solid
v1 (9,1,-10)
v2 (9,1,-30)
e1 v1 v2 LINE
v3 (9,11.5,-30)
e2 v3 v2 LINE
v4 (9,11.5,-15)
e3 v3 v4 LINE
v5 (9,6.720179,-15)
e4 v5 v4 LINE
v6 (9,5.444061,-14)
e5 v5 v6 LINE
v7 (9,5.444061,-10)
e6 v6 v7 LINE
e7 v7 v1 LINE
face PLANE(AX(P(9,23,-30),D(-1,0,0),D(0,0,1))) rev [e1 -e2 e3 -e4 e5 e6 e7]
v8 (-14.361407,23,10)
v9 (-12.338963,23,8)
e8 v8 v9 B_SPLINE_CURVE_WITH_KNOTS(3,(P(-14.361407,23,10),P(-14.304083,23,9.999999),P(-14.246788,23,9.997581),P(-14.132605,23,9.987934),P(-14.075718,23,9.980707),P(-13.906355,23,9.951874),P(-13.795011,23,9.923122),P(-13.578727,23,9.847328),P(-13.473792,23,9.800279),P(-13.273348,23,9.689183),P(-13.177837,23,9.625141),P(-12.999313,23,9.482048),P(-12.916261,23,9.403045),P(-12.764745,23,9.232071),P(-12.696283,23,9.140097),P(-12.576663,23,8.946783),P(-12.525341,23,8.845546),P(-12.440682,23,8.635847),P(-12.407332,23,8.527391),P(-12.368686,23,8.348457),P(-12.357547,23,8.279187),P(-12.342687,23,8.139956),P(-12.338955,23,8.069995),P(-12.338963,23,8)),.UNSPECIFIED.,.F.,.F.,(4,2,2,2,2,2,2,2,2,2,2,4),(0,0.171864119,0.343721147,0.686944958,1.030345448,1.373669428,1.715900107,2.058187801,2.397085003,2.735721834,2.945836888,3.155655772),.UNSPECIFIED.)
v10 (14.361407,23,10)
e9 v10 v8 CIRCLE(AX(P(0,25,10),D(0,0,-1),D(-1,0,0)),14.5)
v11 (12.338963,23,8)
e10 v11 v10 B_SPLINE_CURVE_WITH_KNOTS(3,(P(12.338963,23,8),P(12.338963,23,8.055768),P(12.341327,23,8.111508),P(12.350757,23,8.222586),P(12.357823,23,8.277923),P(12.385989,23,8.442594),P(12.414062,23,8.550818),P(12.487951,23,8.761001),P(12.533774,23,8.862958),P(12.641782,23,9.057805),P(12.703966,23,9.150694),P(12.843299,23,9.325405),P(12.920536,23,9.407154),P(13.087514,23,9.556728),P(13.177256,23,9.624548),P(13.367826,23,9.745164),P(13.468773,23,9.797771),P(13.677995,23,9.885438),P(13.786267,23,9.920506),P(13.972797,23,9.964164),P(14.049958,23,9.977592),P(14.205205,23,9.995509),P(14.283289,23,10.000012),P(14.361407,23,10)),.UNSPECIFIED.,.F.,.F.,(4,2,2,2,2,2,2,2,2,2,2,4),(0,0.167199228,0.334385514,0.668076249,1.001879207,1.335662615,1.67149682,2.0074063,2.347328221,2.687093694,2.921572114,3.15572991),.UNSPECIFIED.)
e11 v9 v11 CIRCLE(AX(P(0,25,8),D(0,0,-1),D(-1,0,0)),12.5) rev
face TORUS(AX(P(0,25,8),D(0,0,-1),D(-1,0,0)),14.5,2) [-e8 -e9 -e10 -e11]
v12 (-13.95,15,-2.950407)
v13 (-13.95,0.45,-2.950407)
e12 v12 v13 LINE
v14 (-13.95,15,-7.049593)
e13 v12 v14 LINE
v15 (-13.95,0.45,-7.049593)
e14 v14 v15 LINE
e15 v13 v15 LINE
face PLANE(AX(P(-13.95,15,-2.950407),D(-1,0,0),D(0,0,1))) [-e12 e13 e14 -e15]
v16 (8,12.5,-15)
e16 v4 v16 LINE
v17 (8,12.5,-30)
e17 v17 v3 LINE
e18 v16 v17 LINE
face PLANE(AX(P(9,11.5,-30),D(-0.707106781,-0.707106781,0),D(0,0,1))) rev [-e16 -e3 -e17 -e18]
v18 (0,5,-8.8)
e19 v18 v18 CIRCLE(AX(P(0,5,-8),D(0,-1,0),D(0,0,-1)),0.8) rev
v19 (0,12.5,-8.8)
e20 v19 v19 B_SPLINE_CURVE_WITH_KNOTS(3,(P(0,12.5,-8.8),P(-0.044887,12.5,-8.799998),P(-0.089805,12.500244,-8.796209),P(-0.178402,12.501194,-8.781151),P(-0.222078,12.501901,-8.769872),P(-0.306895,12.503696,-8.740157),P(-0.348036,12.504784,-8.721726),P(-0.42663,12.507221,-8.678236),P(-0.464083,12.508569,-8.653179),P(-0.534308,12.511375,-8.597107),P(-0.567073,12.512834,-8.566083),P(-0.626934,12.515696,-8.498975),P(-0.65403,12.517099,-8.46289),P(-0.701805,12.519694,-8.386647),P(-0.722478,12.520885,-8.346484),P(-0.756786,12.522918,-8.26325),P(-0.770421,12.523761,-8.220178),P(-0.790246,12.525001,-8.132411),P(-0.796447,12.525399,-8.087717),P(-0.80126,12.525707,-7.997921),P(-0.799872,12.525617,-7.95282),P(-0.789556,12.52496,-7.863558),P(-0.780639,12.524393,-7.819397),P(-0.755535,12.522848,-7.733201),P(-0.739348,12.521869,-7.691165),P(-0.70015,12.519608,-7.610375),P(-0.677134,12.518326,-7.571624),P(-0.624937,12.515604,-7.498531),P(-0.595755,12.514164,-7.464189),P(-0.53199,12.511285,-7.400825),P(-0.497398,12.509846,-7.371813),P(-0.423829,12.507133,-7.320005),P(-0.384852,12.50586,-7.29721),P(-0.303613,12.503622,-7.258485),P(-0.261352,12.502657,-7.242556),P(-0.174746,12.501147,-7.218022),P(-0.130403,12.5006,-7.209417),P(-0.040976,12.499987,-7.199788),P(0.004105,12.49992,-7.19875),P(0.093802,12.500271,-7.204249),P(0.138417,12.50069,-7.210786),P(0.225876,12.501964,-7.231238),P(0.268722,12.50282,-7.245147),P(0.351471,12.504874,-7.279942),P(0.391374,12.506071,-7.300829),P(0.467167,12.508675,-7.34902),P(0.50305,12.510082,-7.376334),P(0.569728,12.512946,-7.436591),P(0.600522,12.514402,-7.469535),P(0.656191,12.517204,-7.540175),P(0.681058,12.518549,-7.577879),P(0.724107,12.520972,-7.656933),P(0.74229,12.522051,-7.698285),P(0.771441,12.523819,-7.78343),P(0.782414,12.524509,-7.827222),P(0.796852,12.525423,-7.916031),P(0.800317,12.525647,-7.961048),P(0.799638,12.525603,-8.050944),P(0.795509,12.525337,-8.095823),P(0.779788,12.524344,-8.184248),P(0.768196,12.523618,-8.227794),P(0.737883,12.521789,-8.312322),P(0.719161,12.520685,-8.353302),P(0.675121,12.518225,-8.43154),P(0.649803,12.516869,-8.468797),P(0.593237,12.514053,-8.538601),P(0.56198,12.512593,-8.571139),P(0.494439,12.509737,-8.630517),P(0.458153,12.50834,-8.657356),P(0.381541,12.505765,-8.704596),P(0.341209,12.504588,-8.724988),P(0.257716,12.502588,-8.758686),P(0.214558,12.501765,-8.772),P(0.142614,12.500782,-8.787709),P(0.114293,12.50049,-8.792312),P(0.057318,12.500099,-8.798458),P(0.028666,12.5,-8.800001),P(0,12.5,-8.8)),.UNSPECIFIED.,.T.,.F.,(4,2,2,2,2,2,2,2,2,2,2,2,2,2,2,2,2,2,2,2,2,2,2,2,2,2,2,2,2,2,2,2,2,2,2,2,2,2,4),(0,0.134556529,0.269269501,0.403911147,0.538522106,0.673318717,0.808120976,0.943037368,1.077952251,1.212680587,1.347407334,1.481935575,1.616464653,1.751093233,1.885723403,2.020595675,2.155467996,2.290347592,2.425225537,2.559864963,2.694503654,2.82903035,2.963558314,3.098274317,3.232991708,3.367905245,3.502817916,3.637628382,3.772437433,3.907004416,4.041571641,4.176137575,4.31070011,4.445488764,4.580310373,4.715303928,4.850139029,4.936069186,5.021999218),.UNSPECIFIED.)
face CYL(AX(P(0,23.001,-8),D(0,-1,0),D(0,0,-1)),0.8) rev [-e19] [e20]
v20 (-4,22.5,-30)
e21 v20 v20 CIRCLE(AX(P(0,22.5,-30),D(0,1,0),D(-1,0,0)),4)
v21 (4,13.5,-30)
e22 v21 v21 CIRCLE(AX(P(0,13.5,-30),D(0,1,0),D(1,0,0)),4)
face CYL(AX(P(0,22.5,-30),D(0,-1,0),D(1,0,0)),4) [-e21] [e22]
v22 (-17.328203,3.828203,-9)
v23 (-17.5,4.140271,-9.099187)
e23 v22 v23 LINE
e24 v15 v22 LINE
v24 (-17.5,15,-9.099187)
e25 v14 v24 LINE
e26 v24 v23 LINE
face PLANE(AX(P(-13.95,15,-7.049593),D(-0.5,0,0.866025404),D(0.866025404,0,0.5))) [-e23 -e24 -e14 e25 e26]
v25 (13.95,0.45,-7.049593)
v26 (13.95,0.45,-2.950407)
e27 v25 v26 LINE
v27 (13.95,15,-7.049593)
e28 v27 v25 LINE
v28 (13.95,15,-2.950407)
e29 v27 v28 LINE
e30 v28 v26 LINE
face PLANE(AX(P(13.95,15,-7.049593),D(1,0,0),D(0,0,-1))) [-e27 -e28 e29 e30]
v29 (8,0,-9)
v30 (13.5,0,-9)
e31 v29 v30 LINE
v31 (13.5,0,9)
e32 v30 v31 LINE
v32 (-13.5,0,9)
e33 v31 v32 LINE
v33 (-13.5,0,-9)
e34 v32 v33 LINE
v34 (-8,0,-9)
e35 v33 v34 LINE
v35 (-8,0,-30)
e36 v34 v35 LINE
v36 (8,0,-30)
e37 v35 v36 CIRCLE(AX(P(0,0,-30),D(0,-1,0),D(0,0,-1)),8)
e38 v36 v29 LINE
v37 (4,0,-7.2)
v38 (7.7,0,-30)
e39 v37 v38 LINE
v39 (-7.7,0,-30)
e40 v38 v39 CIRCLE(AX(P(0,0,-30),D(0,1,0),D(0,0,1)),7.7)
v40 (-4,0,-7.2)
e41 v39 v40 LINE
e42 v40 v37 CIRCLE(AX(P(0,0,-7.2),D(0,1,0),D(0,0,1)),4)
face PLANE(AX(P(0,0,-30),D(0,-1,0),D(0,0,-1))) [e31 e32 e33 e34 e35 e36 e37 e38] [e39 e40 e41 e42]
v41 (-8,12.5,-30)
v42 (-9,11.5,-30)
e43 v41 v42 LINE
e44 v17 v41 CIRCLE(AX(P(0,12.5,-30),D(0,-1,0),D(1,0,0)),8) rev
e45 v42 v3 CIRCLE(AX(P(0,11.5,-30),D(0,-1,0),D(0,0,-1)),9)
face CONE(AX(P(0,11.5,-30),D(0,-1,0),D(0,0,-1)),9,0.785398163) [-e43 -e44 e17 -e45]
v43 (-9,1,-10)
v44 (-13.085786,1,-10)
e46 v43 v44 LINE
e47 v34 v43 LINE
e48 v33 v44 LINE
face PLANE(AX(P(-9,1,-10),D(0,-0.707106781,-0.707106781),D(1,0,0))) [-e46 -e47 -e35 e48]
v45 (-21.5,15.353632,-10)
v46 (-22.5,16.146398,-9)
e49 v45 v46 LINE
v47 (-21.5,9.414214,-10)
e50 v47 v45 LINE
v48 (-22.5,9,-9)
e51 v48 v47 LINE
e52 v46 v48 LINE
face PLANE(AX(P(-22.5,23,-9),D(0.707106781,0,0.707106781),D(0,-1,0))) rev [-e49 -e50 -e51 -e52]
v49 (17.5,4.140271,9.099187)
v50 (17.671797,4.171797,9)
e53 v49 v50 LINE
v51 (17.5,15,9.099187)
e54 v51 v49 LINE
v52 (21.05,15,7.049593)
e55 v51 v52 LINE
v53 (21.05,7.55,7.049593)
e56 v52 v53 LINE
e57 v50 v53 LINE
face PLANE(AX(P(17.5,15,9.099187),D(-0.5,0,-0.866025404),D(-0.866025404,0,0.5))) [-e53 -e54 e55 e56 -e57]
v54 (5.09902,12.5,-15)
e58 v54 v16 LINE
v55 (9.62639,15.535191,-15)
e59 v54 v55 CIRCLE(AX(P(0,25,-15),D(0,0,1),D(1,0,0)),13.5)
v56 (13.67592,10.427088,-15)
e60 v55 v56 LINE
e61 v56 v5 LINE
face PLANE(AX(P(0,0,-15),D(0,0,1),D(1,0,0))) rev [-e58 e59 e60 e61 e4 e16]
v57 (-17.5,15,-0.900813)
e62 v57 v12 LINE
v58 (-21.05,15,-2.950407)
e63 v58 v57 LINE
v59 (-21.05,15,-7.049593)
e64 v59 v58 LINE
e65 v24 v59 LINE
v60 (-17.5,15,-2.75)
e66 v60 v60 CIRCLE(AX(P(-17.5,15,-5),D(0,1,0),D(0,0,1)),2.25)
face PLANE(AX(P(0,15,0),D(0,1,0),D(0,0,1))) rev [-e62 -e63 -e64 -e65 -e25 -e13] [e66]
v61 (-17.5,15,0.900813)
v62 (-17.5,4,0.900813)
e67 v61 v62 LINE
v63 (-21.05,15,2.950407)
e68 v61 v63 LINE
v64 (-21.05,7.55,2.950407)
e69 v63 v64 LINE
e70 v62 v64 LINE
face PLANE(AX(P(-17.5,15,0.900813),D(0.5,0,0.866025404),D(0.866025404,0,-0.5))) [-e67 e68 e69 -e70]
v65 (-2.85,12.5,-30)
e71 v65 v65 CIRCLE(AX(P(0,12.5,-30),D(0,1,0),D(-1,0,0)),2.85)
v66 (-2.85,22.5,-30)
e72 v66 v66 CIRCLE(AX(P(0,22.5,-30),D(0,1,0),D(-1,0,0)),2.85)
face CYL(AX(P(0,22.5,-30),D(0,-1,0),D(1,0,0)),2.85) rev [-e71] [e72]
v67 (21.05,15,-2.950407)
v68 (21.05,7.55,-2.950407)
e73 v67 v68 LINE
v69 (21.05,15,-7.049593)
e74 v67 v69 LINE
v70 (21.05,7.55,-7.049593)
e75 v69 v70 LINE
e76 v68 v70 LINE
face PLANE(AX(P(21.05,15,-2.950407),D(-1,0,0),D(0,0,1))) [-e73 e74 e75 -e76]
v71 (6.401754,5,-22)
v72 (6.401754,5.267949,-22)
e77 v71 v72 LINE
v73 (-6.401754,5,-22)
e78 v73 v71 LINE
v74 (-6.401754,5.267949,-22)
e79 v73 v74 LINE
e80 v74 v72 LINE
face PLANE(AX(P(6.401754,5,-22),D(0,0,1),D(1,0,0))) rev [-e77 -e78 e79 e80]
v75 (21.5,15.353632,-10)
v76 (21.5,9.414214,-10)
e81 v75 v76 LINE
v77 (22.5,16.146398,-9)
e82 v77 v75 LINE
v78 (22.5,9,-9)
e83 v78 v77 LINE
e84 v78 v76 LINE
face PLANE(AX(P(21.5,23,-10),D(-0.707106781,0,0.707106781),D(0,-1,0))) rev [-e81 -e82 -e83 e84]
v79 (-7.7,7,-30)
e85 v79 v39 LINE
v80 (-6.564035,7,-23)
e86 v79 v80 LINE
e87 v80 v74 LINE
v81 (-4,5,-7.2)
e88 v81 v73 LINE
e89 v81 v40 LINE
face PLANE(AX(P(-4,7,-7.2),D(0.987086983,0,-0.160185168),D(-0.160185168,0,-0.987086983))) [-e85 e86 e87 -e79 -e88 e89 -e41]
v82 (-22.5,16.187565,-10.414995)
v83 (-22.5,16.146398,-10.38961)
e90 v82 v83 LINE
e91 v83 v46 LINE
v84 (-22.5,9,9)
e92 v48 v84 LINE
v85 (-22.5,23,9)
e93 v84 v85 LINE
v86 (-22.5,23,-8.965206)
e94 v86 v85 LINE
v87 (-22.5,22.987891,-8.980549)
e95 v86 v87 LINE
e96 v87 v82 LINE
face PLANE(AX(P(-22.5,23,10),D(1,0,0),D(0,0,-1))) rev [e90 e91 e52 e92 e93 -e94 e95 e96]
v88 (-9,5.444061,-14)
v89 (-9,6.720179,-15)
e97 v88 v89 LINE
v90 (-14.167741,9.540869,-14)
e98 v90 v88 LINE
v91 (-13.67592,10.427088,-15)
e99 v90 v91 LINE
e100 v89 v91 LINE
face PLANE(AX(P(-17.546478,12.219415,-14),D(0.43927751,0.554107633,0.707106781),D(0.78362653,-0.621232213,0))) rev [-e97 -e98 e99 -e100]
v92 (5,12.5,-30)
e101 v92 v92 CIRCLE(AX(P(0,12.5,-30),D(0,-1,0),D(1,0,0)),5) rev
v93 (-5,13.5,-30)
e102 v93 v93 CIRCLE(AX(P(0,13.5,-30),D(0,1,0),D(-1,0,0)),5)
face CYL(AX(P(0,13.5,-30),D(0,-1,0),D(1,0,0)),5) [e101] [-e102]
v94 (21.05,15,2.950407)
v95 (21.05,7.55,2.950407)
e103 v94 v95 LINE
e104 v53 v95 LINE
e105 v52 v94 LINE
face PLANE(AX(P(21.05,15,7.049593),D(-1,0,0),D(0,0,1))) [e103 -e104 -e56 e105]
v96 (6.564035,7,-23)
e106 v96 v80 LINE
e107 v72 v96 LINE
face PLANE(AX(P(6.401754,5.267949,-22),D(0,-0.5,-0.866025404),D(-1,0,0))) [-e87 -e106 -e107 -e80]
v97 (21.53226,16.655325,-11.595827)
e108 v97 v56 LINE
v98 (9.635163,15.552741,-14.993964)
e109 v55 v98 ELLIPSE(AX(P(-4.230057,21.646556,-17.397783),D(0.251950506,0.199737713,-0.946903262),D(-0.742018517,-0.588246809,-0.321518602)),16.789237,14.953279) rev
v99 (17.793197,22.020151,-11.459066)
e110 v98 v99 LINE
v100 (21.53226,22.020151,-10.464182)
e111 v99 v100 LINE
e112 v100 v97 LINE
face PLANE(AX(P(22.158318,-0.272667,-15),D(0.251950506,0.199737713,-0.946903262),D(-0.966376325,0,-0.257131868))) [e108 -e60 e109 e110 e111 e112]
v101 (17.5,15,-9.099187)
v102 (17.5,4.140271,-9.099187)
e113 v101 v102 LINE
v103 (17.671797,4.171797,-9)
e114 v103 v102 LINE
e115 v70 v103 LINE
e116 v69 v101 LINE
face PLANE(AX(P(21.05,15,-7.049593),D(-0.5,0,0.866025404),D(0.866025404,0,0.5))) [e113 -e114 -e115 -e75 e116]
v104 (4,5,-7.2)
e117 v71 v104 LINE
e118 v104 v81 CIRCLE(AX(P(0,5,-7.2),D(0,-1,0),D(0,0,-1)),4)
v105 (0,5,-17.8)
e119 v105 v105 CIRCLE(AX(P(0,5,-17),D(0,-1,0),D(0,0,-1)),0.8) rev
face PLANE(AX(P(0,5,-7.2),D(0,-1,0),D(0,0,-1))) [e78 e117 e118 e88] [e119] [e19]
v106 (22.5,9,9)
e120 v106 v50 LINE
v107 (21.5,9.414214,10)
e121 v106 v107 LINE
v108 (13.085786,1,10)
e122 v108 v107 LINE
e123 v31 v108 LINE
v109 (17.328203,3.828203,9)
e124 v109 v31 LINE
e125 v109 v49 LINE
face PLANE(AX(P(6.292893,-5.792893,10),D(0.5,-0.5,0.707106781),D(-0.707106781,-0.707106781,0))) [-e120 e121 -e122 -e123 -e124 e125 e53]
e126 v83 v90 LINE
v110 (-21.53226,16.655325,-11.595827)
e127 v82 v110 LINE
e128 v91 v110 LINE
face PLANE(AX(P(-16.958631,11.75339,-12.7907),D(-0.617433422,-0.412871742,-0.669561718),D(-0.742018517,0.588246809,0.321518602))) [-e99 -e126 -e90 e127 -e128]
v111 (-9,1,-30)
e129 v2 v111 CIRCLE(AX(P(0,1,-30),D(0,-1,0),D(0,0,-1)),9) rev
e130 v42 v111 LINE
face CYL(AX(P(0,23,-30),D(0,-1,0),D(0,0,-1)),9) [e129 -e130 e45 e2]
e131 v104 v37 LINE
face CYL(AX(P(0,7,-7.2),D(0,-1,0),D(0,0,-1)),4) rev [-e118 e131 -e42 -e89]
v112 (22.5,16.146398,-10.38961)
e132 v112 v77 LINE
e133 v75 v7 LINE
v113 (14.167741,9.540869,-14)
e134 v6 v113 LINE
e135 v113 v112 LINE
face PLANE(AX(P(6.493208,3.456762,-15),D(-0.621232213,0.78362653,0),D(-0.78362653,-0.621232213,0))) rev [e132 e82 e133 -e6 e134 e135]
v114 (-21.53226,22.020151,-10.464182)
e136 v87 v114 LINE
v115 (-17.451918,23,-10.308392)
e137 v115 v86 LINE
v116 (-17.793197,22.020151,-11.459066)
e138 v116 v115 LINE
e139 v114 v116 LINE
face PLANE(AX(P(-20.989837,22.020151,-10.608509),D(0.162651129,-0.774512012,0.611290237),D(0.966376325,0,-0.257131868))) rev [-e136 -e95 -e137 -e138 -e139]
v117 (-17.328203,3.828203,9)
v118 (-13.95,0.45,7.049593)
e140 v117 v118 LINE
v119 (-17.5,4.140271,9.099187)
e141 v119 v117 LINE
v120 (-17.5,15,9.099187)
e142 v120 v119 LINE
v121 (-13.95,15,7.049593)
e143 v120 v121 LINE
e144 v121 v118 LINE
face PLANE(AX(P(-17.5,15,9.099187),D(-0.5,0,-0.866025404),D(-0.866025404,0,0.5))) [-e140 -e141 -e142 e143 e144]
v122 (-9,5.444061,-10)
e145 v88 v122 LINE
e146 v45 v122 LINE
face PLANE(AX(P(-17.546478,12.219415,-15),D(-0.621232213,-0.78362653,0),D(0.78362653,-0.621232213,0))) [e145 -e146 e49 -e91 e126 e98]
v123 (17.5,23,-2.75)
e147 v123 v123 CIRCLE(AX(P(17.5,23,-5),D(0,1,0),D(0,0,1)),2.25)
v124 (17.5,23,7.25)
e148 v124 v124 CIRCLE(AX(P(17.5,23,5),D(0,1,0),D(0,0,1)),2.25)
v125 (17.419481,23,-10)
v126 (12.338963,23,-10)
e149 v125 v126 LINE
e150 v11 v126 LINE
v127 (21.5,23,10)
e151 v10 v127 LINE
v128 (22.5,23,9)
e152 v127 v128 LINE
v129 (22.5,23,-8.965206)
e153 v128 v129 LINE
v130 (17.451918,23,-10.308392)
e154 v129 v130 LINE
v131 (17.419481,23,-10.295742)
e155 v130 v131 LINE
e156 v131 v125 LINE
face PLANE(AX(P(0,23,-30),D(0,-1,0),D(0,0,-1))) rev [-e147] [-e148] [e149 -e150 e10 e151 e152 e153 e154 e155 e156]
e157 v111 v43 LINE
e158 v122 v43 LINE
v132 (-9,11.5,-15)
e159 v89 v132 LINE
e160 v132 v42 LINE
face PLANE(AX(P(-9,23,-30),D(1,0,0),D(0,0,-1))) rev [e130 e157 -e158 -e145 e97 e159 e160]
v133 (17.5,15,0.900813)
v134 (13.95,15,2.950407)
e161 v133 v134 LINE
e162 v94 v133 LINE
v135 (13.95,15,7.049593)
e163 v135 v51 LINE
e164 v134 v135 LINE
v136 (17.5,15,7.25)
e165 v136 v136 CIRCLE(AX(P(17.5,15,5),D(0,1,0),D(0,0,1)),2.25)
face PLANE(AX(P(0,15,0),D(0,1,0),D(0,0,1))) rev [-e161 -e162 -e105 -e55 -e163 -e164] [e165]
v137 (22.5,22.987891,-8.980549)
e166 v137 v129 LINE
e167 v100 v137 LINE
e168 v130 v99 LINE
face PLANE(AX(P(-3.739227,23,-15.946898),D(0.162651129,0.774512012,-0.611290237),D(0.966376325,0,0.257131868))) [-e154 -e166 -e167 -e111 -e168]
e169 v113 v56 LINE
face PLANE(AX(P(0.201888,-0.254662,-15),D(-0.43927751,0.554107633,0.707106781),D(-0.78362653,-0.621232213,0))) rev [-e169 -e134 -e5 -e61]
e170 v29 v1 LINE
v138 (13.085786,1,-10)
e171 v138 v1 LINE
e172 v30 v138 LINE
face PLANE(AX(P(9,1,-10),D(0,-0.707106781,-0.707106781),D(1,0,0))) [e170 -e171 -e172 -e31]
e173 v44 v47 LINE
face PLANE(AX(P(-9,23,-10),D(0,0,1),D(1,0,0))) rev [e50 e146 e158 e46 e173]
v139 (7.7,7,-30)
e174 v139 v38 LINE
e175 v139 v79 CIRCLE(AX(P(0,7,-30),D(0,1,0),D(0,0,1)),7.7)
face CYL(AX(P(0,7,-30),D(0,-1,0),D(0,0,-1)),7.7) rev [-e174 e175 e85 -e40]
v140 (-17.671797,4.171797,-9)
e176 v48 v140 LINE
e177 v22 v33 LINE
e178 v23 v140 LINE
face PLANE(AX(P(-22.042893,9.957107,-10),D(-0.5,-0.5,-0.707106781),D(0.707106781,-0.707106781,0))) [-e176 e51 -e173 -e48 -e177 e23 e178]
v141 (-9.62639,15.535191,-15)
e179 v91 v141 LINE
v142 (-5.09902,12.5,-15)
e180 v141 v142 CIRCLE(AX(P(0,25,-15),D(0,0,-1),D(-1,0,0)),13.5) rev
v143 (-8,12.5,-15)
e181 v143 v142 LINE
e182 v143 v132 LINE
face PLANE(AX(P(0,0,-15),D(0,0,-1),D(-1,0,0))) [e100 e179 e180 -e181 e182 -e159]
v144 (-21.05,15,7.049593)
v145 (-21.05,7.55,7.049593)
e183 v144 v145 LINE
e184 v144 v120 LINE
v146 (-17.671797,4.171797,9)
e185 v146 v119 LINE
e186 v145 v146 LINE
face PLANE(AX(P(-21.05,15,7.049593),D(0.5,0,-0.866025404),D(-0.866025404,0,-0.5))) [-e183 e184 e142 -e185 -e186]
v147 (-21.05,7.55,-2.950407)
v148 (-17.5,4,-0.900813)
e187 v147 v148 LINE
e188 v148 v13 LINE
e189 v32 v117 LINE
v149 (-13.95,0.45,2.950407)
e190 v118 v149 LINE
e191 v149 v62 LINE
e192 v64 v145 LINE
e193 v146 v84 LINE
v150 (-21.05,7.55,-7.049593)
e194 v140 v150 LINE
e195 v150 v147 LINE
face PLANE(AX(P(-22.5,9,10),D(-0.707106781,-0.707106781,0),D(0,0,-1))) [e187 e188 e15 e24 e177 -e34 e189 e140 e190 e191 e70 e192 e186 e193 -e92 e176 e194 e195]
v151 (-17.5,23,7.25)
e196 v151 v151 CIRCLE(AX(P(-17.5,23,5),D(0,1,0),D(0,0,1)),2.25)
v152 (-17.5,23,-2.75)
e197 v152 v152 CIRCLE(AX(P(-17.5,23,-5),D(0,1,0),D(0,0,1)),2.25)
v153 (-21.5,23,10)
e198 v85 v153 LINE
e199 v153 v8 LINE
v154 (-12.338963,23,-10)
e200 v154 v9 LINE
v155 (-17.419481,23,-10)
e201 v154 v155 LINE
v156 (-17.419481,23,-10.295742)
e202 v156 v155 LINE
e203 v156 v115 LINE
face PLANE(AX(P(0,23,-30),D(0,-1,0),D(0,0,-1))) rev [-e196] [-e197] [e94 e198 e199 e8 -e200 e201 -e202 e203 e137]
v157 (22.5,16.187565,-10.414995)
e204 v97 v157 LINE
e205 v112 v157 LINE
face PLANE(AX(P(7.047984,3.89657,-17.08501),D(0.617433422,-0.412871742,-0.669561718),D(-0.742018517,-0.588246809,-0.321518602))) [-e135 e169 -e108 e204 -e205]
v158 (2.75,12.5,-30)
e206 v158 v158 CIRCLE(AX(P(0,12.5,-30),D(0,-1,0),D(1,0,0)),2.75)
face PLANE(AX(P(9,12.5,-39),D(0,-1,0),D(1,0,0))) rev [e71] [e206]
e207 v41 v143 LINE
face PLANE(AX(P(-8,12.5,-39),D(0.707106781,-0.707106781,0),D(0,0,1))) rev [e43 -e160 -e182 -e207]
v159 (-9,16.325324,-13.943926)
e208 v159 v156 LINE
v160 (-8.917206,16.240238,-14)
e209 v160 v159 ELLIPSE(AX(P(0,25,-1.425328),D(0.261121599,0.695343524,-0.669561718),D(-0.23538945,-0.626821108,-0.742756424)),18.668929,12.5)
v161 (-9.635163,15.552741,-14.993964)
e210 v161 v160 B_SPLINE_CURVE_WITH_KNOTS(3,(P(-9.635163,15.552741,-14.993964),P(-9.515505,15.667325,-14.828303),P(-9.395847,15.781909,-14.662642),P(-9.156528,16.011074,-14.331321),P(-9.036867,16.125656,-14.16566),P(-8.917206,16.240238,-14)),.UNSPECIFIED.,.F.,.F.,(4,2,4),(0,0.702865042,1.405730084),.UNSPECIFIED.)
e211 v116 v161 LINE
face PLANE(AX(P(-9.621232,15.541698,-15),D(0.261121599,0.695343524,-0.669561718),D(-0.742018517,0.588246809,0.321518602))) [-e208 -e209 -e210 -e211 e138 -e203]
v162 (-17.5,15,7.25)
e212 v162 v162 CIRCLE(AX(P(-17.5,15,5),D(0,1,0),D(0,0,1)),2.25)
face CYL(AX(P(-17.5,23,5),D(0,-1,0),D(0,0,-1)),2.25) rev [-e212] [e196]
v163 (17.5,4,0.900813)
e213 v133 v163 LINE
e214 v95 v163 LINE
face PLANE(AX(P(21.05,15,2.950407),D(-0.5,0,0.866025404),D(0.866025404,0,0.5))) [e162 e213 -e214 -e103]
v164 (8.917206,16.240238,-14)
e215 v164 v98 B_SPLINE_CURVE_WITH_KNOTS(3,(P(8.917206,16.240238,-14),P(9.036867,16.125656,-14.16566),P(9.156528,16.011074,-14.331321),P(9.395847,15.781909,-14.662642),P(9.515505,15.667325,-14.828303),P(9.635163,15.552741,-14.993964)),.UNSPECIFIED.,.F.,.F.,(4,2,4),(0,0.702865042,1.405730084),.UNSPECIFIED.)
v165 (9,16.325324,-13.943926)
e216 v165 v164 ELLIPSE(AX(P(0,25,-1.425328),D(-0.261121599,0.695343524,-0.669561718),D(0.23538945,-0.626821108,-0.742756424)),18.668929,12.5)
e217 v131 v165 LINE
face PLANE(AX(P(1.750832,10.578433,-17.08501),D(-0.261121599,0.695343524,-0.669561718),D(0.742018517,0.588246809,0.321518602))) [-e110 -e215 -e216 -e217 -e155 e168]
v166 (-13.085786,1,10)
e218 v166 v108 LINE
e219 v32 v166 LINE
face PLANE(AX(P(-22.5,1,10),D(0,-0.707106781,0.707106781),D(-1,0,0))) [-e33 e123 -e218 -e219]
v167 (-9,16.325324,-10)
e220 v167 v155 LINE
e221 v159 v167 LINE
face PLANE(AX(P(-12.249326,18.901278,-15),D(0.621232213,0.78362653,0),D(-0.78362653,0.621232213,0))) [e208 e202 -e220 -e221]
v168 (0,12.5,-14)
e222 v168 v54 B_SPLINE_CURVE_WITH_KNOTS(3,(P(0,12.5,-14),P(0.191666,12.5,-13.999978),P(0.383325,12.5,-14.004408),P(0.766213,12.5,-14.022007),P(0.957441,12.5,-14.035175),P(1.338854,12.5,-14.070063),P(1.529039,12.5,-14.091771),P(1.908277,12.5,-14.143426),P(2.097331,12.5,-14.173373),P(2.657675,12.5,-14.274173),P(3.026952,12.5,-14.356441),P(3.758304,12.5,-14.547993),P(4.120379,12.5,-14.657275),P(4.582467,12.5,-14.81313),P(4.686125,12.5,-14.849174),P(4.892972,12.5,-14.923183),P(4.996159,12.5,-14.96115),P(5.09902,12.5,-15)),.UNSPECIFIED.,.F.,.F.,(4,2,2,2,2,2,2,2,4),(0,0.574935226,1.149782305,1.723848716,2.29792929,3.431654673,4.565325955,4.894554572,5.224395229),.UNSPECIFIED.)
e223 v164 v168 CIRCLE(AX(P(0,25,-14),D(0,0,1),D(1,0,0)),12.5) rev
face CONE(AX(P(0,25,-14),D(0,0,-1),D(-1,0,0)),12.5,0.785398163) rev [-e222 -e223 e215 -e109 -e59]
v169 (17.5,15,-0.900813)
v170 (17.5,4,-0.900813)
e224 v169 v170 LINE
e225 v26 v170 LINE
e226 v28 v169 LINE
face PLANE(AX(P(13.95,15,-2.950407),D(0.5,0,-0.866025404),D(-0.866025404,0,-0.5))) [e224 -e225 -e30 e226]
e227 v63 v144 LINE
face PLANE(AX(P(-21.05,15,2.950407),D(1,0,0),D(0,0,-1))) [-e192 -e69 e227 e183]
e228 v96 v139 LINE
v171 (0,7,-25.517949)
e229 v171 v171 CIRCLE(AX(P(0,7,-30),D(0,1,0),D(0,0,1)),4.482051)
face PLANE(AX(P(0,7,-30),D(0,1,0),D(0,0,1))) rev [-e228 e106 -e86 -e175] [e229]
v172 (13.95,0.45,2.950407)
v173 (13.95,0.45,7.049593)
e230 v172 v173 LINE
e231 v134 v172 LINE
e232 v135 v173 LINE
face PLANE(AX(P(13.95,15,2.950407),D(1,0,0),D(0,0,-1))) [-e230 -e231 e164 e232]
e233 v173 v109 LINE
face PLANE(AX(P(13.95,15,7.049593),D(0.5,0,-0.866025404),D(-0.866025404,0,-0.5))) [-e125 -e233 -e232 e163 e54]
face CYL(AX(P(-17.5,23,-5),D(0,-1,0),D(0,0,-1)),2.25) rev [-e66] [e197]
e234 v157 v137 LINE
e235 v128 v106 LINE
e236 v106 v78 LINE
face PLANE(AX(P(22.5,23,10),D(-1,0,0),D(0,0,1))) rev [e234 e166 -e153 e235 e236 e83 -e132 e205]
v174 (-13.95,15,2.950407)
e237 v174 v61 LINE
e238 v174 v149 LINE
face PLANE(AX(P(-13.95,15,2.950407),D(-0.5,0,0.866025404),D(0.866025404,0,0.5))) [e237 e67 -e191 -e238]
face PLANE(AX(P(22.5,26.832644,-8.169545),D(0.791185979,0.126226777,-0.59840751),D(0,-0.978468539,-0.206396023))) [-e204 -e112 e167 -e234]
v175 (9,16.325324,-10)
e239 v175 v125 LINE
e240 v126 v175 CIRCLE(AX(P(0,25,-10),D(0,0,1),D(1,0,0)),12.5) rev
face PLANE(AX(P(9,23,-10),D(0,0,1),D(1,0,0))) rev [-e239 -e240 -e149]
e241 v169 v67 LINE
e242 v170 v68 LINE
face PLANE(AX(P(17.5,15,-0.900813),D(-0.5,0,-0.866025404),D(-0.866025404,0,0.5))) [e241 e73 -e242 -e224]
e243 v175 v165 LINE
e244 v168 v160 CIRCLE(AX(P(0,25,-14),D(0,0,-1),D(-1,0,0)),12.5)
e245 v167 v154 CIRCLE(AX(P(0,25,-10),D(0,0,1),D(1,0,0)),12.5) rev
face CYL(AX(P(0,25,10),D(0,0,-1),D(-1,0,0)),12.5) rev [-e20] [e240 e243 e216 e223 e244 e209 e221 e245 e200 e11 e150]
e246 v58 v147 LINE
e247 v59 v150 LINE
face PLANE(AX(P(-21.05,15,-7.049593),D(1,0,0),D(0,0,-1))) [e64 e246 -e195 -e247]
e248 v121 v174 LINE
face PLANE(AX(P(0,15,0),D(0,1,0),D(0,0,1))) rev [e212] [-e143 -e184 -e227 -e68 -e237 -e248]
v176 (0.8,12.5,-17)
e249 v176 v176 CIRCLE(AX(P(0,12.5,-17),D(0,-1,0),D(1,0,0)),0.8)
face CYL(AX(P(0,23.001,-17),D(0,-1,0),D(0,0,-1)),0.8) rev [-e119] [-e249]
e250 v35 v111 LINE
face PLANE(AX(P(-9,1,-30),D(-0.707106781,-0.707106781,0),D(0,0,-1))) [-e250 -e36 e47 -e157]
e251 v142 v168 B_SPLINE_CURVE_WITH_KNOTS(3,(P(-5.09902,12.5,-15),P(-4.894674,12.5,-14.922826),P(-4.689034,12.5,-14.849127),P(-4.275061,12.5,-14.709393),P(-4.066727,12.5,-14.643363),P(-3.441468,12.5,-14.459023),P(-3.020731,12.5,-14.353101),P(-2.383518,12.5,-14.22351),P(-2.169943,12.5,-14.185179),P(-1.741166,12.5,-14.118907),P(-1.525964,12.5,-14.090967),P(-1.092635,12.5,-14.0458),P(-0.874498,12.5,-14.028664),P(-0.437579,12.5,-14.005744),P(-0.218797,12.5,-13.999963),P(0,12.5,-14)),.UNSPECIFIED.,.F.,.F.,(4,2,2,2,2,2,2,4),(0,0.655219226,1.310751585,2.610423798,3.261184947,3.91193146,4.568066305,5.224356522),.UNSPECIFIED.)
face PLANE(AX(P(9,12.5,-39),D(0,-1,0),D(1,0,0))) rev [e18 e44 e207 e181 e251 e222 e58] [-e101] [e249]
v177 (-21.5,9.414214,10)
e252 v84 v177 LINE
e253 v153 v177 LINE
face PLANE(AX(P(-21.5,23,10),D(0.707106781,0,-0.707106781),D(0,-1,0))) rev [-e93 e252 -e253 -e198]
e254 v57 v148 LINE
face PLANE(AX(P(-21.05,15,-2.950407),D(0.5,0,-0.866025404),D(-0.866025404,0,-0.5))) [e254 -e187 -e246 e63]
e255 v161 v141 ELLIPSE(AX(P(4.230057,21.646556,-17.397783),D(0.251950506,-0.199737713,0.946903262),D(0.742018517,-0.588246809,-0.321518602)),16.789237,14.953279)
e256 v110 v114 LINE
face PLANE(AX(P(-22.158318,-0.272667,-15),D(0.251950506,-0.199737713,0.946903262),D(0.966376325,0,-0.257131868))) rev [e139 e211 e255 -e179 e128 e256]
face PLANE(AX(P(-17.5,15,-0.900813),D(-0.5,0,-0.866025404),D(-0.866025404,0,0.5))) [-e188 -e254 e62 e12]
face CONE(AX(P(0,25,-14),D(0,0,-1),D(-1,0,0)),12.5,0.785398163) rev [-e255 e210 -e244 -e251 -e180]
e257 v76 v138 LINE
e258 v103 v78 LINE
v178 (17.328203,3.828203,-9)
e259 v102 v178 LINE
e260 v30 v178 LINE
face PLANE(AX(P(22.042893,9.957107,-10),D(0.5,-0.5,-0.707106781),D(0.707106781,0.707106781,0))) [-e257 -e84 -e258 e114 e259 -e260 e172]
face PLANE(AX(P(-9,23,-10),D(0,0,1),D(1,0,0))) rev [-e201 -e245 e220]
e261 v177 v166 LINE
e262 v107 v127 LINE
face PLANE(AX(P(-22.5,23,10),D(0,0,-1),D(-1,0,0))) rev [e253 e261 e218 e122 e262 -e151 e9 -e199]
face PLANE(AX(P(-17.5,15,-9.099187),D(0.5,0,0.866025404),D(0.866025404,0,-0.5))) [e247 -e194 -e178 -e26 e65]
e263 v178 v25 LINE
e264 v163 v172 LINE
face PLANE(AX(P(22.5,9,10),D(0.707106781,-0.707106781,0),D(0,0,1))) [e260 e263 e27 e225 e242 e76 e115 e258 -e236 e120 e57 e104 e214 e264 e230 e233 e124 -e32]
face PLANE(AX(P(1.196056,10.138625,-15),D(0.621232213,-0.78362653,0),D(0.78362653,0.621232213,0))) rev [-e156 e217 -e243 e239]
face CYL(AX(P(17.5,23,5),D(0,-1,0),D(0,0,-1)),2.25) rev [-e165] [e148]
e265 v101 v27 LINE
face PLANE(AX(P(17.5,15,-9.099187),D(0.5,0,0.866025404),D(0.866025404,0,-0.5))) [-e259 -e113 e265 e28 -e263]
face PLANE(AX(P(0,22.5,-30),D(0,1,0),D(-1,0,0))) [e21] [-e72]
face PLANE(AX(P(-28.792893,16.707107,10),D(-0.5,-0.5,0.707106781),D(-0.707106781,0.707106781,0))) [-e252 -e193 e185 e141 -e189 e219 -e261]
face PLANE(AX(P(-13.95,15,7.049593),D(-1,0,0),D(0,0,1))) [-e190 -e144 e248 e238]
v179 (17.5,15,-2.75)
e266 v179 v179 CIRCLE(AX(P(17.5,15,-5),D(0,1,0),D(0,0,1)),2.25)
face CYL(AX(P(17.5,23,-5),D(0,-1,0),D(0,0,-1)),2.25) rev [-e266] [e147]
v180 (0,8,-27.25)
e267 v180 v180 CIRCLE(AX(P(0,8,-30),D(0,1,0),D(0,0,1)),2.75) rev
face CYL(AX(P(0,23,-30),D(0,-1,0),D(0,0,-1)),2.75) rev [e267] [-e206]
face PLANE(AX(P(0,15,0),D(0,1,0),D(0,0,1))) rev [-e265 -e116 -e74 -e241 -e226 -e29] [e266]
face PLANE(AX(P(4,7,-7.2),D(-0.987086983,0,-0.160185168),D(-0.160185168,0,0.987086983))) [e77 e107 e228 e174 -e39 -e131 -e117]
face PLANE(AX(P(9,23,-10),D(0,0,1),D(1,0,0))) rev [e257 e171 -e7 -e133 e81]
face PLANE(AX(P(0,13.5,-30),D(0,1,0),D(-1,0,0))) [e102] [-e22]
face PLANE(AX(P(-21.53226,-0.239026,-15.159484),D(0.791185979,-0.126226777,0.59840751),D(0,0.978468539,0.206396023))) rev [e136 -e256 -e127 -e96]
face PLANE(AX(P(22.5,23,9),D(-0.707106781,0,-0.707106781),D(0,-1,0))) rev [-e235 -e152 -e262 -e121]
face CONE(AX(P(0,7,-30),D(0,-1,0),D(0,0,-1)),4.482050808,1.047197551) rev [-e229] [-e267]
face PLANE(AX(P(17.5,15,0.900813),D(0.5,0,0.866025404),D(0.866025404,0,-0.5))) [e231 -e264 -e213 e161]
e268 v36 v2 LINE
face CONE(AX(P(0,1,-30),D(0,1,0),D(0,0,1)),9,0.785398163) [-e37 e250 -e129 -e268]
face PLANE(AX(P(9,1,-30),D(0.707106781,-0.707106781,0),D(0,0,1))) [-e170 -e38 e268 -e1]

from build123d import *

# Parameters (mm, degrees)
SKETCH1_R               = 2.25
SKETCH1_R_2             = 2.75
BOSS_EXTRUDE1_DEPTH     = 23
CUT_EXTRUDE1_DEPTH      = 10
CUT_EXTRUDE1_DEPTH_BACK = 51.55937104
SKETCH2_R               = 12.5
BOSS_EXTRUDE2_START     = -22.5
BOSS_EXTRUDE2_DEPTH     = 5
CUT_EXTRUDE8_REACH      = 52.496
FILLET1_R               = 2
CHAMFER1_SIZE           = 9
CHAMFER2_SIZE           = 1
SKETCH5_R               = 3.35
CUT_EXTRUDE10_DEPTH     = 4
CUT_EXTRUDE11_START     = -15
SKETCH6_W               = 18
SKETCH6_H               = 3.825324214
CUT_EXTRUDE11_DEPTH     = 36.559371208
CHAMFER3_SIZE           = 1
CHAMFER4_SIZE           = 1
CHAMFER5_SIZE           = 1
CHAMFER6_SIZE           = 1
SKETCH7_R               = 4
SKETCH7_R_2             = 2.85
BOSS_EXTRUDE3_DEPTH     = 10
SKETCH8_R               = 5
SKETCH8_R_2             = 4
EXTRUDE_THIN1_DEPTH     = 1
SKETCH10_R              = 0.3
BOSS_EXTRUDE4_DEPTH     = 4
BOSS_EXTRUDE5_START     = 4
SKETCH11_R              = 2.5
SKETCH11_R_2            = 1.6
BOSS_EXTRUDE5_DEPTH     = 2
SKETCH13_R              = 1.6
SKETCH13_R_2            = 0.8
CUT_EXTRUDE13_DEPTH     = 7
BOSS_EXTRUDE6_START     = 2
BOSS_EXTRUDE6_DEPTH     = 2
CUT_EXTRUDE14_REACH     = 52.559
SKETCH13_2_R            = 0.8
CHAMFER8_SIZE           = 1
CHAMFER8_SIZE2          = 1.732050808
CHAMFER9_SIZE           = 1
CHAMFER9_SIZE2          = 1.732050808
CUT_EXTRUDE15_DEPTH     = 15


with BuildPart() as part:
    # Sketch1 → Boss-Extrude1 (new body)
    with BuildSketch(Plane(origin=(0, 0, 0), x_dir=(1, 0, 0), z_dir=(0, 1, 0))):
        with BuildLine():
            Line((-22.5, -10), (-22.5, 10))
            Line((-22.5, 10), (-9, 10))
            Line((-9, 10), (-9, 30))
            ThreePointArc((-9, 30), (0, 39), (9, 30))
            Line((9, 30), (9, 10))
            Line((9, 10), (22.5, 10))
            Line((22.5, 10), (22.5, -10))
            Line((22.5, -10), (-22.5, -10))
        make_face()
        with Locations(Location((-17.5, 5, 0), (0, 0, 270))):
            Circle(SKETCH1_R, mode=Mode.SUBTRACT)
        with Locations(Location((-17.5, -5, 0), (0, 0, 270))):
            Circle(SKETCH1_R, mode=Mode.SUBTRACT)
        with Locations(Location((17.5, 5, 0), (0, 0, 270))):
            Circle(SKETCH1_R, mode=Mode.SUBTRACT)
        with Locations(Location((17.5, -5, 0), (0, 0, 270))):
            Circle(SKETCH1_R, mode=Mode.SUBTRACT)
        with Locations(Location((0, 30, 0), (0, 0, 270))):
            Circle(SKETCH1_R_2, mode=Mode.SUBTRACT)
    extrude(amount=BOSS_EXTRUDE1_DEPTH)

    # Sketch2 → Cut-Extrude1 (cut, two sides: drawn at the far end of the back side and taken through both)
    with BuildSketch(Plane.XY.offset(-CUT_EXTRUDE1_DEPTH_BACK)):
        with Locations((0, 25)):
            Circle(SKETCH2_R)
    extrude(amount=CUT_EXTRUDE1_DEPTH + CUT_EXTRUDE1_DEPTH_BACK, mode=Mode.SUBTRACT)

    # Sketch3 → Boss-Extrude2 (add)
    with BuildSketch(Plane(origin=(0, 0, -32.5), x_dir=(-1, 0, 0), z_dir=(0, 0, -1)).offset(BOSS_EXTRUDE2_START)):
        Polygon((9, 16.325324214), (17.41948134, 23), (22.5, 23), (22.5, 16.146397564), (9, 5.444060985), align=None)
    boss_extrude2 = extrude(amount=BOSS_EXTRUDE2_DEPTH)

    # Mirror1: Boss-Extrude2 across plane
    add(boss_extrude2.mirror(Plane(origin=(0, 0, 0), x_dir=(0, 0, 1), z_dir=(1, 0, 0))))

    # Sketch4 → Cut-Extrude8 (cut, up to next)
    with BuildSketch(Plane(origin=(4.474031923, 5.643574234, 0), x_dir=(0.7836265295847679, -0.6212322127280048, 0), z_dir=(0.6212322127280048, 0.7836265295847679, 0)), mode=Mode.PRIVATE) as cut_extrude8_sk1:
        Polygon((-17.194456051, 15), (-31.919937808, 10), (-31.919937808, 15.796390808), (-17.194456051, 15.796390808), align=None)
    cut_extrude8_tool1 = extrude(cut_extrude8_sk1.sketch, amount=-CUT_EXTRUDE8_REACH, mode=Mode.PRIVATE) & part.part
    cut_extrude8 = cut_extrude8_tool1.solids().sort_by_distance((-16.228214, 22.055604, -13.832193))[0]
    add(cut_extrude8, mode=Mode.SUBTRACT)

    # Mirror2: Cut-Extrude8 across plane
    add(cut_extrude8.mirror(Plane(origin=(0, 0, 0), x_dir=(0, 0, 1), z_dir=(1, 0, 0))), mode=Mode.SUBTRACT)

    # Fillet1
    fillet1_edges = [part.edges().sort_by_distance(p)[0] for p in [
        (0, 12.5, 10),
    ]]
    fillet(fillet1_edges, radius=FILLET1_R)

    # Chamfer1
    # the kernel refuses this chamfer: 9 mm, written as the material it takes off along each edge
    with BuildSketch(Plane(origin=(22.5, 0, -33.145146892), x_dir=(-0.9996219169112966, -0.027495876610586365, 0), z_dir=(0, 0, 1))) as chamfer1_piece_1:
        Polygon((CHAMFER1_SIZE * 0.999621916911, -CHAMFER1_SIZE * 0.0274958766106), (-CHAMFER1_SIZE * 0.0274958766106, -CHAMFER1_SIZE * 0.999621916911), (0, 0), align=None)
    extrude(amount=66.290293783, mode=Mode.SUBTRACT)
    with BuildSketch(Plane(origin=(-22.5, 0, 33.145146892), x_dir=(-0.02749587661058639, 0.9996219169112966, 0), z_dir=(0, 0, -1))) as chamfer1_piece_2:
        Polygon((CHAMFER1_SIZE * 0.999621916911, CHAMFER1_SIZE * 0.0274958766106), (-CHAMFER1_SIZE * 0.0274958766106, CHAMFER1_SIZE * 0.999621916911), (0, 0), align=None)
    extrude(amount=66.290293783, mode=Mode.SUBTRACT)

    # Chamfer2
    chamfer2_edges = [part.edges().sort_by_distance(p)[0] for p in [
        (-11.25, 0, -10),
        (11.25, 0, -10),
        (18, 4.5, -10),
        (0, 0, 10),
        (-18, 4.5, 10),
        (18, 4.5, 10),
        (-18, 4.5, -10),
        (22.5, 16, 10),
        (-22.5, 16, 10),
        (-22.5, 12.573198782, -10),
        (22.5, 12.573198782, -10),
        (-9, 0, -20),
        (0, 0, -39),
        (9, 0, -20),
    ]]
    chamfer(chamfer2_edges, length=CHAMFER2_SIZE)

    # Sketch5 → Cut-Extrude10 (cut)
    with BuildSketch(Plane(origin=(0, 0, 0), x_dir=(1, 0, 0), z_dir=(0, 1, 0))):
        with Locations(Location((0, 30, 0), (0, 0, 270))):
            Circle(SKETCH5_R)
    extrude(amount=CUT_EXTRUDE10_DEPTH, mode=Mode.SUBTRACT)

    # Sketch6 → Cut-Extrude11 (cut, through all)
    with BuildSketch(Plane.XY.offset(CUT_EXTRUDE11_START)):
        with Locations((0, 14.412662107)):
            Rectangle(SKETCH6_W, SKETCH6_H)
    extrude(amount=-CUT_EXTRUDE11_DEPTH, mode=Mode.SUBTRACT)

    # Chamfer3
    chamfer3_edges = [part.edges().sort_by_distance(p)[0] for p in [
        (0, 12.5, -39),
        (9, 12.5, -22.5),
        (-9, 12.5, -22.5),
    ]]
    chamfer(chamfer3_edges, length=CHAMFER3_SIZE)

    # Chamfer4
    # the kernel refuses this chamfer: 1 mm, written as the material it takes off along each edge
    with BuildSketch(Plane(origin=(0, 25, -15), x_dir=(0, -1, 0), z_dir=(1, 0, 0))) as chamfer4_piece_1_section:
        Polygon((12.5 + CHAMFER4_SIZE, 0), (12.5, -CHAMFER4_SIZE), (12.5, 0), align=None)
    chamfer4_piece_1 = revolve(axis=Axis((0, 25, -15), (0, 0, -1)), revolution_arc=57.843446633, mode=Mode.PRIVATE)
    chamfer4_piece_1 = split(chamfer4_piece_1, bisect_by=Plane(origin=(-3.818564671, 12.5, -14.588370219), z_dir=(0, 1, 0)), keep=Keep.TOP, mode=Mode.PRIVATE)
    add(chamfer4_piece_1, mode=Mode.SUBTRACT)
    with BuildSketch(Plane(origin=(0, 25, -15), x_dir=(0.8465969958559083, -0.5322344658209869, 0), z_dir=(0.5322344658209869, 0.8465969958559083, 0))) as chamfer4_piece_2_section:
        Polygon((12.5, -CHAMFER4_SIZE), (12.5 + CHAMFER4_SIZE, 0), (12.5, 0), align=None)
    chamfer4_piece_2 = revolve(axis=Axis((0, 25, -15), (0, 0, -1)), revolution_arc=57.843446633, mode=Mode.PRIVATE)
    chamfer4_piece_2 = split(chamfer4_piece_2, bisect_by=Plane(origin=(7.537884287, 12.5, -14.673877281), z_dir=(0, 1, 0)), keep=Keep.TOP, mode=Mode.PRIVATE)
    add(chamfer4_piece_2, mode=Mode.SUBTRACT)

    # Chamfer5
    chamfer5_edges = [part.edges().sort_by_distance(p)[0] for p in [
        (-11.648575872, 7.543761018, -15),
        (-18.398575872, 12.894929307, -13.222841989),
        (-13.931019885, 20.234467509, -12.863375935),
        (18.398575872, 12.894929307, -13.222841989),
        (11.648575872, 7.543761018, -15),
        (13.931019885, 20.234467509, -12.863375935),
    ]]
    chamfer(chamfer5_edges, length=CHAMFER5_SIZE)

    # Chamfer6
    chamfer6_edges = [part.edges().sort_by_distance(p)[0] for p in [
        (20.764592688, 23, -10.461754404),
        (-22.5, 20.211257833, -10.588251201),
        (22.5, 20.211257833, -10.588251201),
        (-20.764592688, 23, -10.461754404),
    ]]
    chamfer(chamfer6_edges, length=CHAMFER6_SIZE)

    # Sketch7 → Boss-Extrude3 (add)
    with BuildSketch(Plane(origin=(0, 12.5, 0), x_dir=(1, 0, 0), z_dir=(0, 1, 0))):
        with Locations((0, 30)):
            Circle(SKETCH7_R)
        with Locations(Location((0, 30, 0), (0, 0, 180))):
            Circle(SKETCH7_R_2, mode=Mode.SUBTRACT)
    extrude(amount=BOSS_EXTRUDE3_DEPTH)

    # Sketch8 → Extrude-Thin1 (add)
    with BuildSketch(Plane(origin=(0, 12.5, 0), x_dir=(1, 0, 0), z_dir=(0, 1, 0))):
        with Locations((0, 30)):
            Circle(SKETCH8_R)
        with Locations((0, 30)):
            Circle(SKETCH8_R_2, mode=Mode.SUBTRACT)
    extrude(amount=EXTRUDE_THIN1_DEPTH)

    # Sketch10 → Boss-Extrude4 (add)
    with BuildSketch(Plane(origin=(0, 0, 0), x_dir=(1, 0, 0), z_dir=(0, 1, 0))):
        with Locations((0.219852061, 26.8)):
            Circle(SKETCH10_R)
        with Locations((-0.582862634, 26.8458589)):
            Circle(SKETCH10_R)
        with Locations((-1.348953927, 27.089904086)):
            Circle(SKETCH10_R)
        with Locations((-2.030285484, 27.5168013)):
            Circle(SKETCH10_R)
        with Locations((-2.584046736, 28.099727021)):
            Circle(SKETCH10_R)
        with Locations((-2.975442829, 28.802053882)):
            Circle(SKETCH10_R)
        with Locations((-3.179880906, 29.579652104)):
            Circle(SKETCH10_R)
        with Locations((-3.184515371, 30.38366233)):
            Circle(SKETCH10_R)
        with Locations((-2.989055023, 31.16356564)):
            Circle(SKETCH10_R)
        with Locations((-2.605781355, 31.870357842)):
            Circle(SKETCH10_R)
        with Locations((-2.058776861, 32.459628583)):
            Circle(SKETCH10_R)
        with Locations((-1.382411846, 32.894351813)):
            Circle(SKETCH10_R)
        with Locations((-0.61918481, 33.147212274)):
            Circle(SKETCH10_R)
        with Locations((0.182947885, 33.202321814)):
            Circle(SKETCH10_R)
        with Locations((0.973585292, 33.056217697)):
            Circle(SKETCH10_R)
        with Locations((1.703048753, 32.718080181)):
            Circle(SKETCH10_R)
        with Locations((2.325503399, 32.209155692)):
            Circle(SKETCH10_R)
        with Locations((2.801838113, 31.561421826)):
            Circle(SKETCH10_R)
        with Locations((3.102123034, 30.815578084)):
            Circle(SKETCH10_R)
        with Locations((3.207490156, 30.018488571)):
            Circle(SKETCH10_R)
        with Locations((3.111318875, 29.220237354)):
            Circle(SKETCH10_R)
        with Locations((2.819651987, 28.470981491)):
            Circle(SKETCH10_R)
        with Locations((2.350815994, 27.817799485)):
            Circle(SKETCH10_R)
        with Locations((1.734269587, 27.301733162)):
            Circle(SKETCH10_R)
        with Locations((1.008752644, 26.955208869)):
            Circle(SKETCH10_R)
    extrude(amount=BOSS_EXTRUDE4_DEPTH)


with BuildPart() as body_2:
    # Sketch11 → Boss-Extrude5 (new body)
    with BuildSketch(Plane(origin=(0, 0, 0), x_dir=(1, 0, 0), z_dir=(0, 1, 0)).offset(BOSS_EXTRUDE5_START)):
        with Locations(Location((0, 30, 0), (0, 0, 270))):
            Circle(SKETCH11_R)
        with Locations(Location((0, 30, 0), (0, 0, 270))):
            Circle(SKETCH11_R_2, mode=Mode.SUBTRACT)
    extrude(amount=BOSS_EXTRUDE5_DEPTH)


with BuildPart() as cut_extrude13_tool:
    # Sketch13 → Cut-Extrude13 (new body)
    with BuildSketch(Plane(origin=(0, 0, 0), x_dir=(1, 0, 0), z_dir=(0, 1, 0))):
        with BuildLine():
            Line((-4, 7.2), (-7.7, 30))
            ThreePointArc((-7.7, 30), (0, 37.7), (7.7, 30))
            Line((7.7, 30), (4, 7.2))
            ThreePointArc((4, 7.2), (0, 3.2), (-4, 7.2))
        make_face()
        with Locations((0, 30)):
            Circle(SKETCH13_R, mode=Mode.SUBTRACT)
        with Locations(Location((0, 17, 0), (0, 0, 270))):
            Circle(SKETCH13_R_2, mode=Mode.SUBTRACT)
        with Locations(Location((0, 8, 0), (0, 0, 270))):
            Circle(SKETCH13_R_2, mode=Mode.SUBTRACT)
    extrude(amount=CUT_EXTRUDE13_DEPTH)


with BuildPart() as part_1:
    add(part.part)

    # Cut-Extrude13: cut by cut_extrude13_tool
    add(cut_extrude13_tool.part, mode=Mode.SUBTRACT)

    # Sketch14 → Boss-Extrude6 (add)
    with BuildSketch(Plane(origin=(0, 7, 0), x_dir=(-1, 0, 0), z_dir=(0, -1, 0)).offset(BOSS_EXTRUDE6_START)):
        with BuildLine():
            Line((-6.401754386, 22), (6.401754386, 22))
            Line((6.401754386, 22), (4, 7.2))
            ThreePointArc((4, 7.2), (0, 3.2), (-4, 7.2))
            Line((-4, 7.2), (-6.401754386, 22))
        make_face()
    extrude(amount=-BOSS_EXTRUDE6_DEPTH)

    # Sketch13<2> → Cut-Extrude14 (cut, up to next)
    with BuildSketch(Plane(origin=(0, 0, 0), x_dir=(1, 0, 0), z_dir=(0, 1, 0)), mode=Mode.PRIVATE) as cut_extrude14_sk1:
        with Locations(Location((0, 17, 0), (0, 0, 90))):
            Circle(SKETCH13_2_R)
    cut_extrude14_tool1 = extrude(cut_extrude14_sk1.sketch, amount=CUT_EXTRUDE14_REACH, mode=Mode.PRIVATE) & part_1.part
    # Sketch13<2> → Cut-Extrude14 (cut, up to next)
    with BuildSketch(Plane(origin=(0, 0, 0), x_dir=(1, 0, 0), z_dir=(0, 1, 0)), mode=Mode.PRIVATE) as cut_extrude14_sk2:
        with Locations(Location((0, 8, 0), (0, 0, 90))):
            Circle(SKETCH13_2_R)
    cut_extrude14_tool2 = extrude(cut_extrude14_sk2.sketch, amount=CUT_EXTRUDE14_REACH, mode=Mode.PRIVATE) & part_1.part
    add(cut_extrude14_tool1.solids().sort_by_distance((0, 0, -17))[0], mode=Mode.SUBTRACT)
    add(cut_extrude14_tool2.solids().sort_by_distance((0, 0, -8))[0], mode=Mode.SUBTRACT)

    # Chamfer8
    chamfer8_edges = [part_1.edges().sort_by_distance(p)[0] for p in [
        (0, 7, -22),
    ]]
    chamfer8_side = [part_1.faces().sort_by_distance(p)[0] for p in [
        (0, 7, -22.21992044),
    ]]
    chamfer(chamfer8_edges, length=CHAMFER8_SIZE, length2=CHAMFER8_SIZE2, reference=chamfer8_side[0])

    # Chamfer9
    chamfer9_edges = [part_1.edges().sort_by_distance(p)[0] for p in [
        (0, 7, -32.75),
    ]]
    chamfer9_side = [part_1.faces().sort_by_distance(p)[0] for p in [
        (0, 9.75, -32.75),
    ]]
    chamfer(chamfer9_edges, length=CHAMFER9_SIZE, length2=CHAMFER9_SIZE2, reference=chamfer9_side[0])

    # Sketch15 → Cut-Extrude15 (cut)
    with BuildSketch(Plane(origin=(0, 0, 0), x_dir=(1, 0, 0), z_dir=(0, 1, 0))):
        Polygon((-17.5, 9.099186911), (-21.05, 7.049593456), (-21.05, 2.950406544), (-17.5, 0.900813089), (-13.95, 2.950406544), (-13.95, 7.049593456), align=None)
        Polygon((-17.5, -0.900813089), (-21.05, -2.950406544), (-21.05, -7.049593456), (-17.5, -9.099186911), (-13.95, -7.049593456), (-13.95, -2.950406544), align=None)
        Polygon((17.5, 9.099186911), (13.95, 7.049593456), (13.95, 2.950406544), (17.5, 0.900813089), (21.05, 2.950406544), (21.05, 7.049593456), align=None)
        Polygon((17.5, -0.900813089), (13.95, -2.950406544), (13.95, -7.049593456), (17.5, -9.099186911), (21.05, -7.049593456), (21.05, -2.950406544), align=None)
    extrude(amount=CUT_EXTRUDE15_DEPTH, mode=Mode.SUBTRACT)


with BuildPart() as body_2_1:
    add(body_2.part)

    # Cut-Extrude13: cut by cut_extrude13_tool
    add(cut_extrude13_tool.part, mode=Mode.SUBTRACT)


solid = part_1.part
